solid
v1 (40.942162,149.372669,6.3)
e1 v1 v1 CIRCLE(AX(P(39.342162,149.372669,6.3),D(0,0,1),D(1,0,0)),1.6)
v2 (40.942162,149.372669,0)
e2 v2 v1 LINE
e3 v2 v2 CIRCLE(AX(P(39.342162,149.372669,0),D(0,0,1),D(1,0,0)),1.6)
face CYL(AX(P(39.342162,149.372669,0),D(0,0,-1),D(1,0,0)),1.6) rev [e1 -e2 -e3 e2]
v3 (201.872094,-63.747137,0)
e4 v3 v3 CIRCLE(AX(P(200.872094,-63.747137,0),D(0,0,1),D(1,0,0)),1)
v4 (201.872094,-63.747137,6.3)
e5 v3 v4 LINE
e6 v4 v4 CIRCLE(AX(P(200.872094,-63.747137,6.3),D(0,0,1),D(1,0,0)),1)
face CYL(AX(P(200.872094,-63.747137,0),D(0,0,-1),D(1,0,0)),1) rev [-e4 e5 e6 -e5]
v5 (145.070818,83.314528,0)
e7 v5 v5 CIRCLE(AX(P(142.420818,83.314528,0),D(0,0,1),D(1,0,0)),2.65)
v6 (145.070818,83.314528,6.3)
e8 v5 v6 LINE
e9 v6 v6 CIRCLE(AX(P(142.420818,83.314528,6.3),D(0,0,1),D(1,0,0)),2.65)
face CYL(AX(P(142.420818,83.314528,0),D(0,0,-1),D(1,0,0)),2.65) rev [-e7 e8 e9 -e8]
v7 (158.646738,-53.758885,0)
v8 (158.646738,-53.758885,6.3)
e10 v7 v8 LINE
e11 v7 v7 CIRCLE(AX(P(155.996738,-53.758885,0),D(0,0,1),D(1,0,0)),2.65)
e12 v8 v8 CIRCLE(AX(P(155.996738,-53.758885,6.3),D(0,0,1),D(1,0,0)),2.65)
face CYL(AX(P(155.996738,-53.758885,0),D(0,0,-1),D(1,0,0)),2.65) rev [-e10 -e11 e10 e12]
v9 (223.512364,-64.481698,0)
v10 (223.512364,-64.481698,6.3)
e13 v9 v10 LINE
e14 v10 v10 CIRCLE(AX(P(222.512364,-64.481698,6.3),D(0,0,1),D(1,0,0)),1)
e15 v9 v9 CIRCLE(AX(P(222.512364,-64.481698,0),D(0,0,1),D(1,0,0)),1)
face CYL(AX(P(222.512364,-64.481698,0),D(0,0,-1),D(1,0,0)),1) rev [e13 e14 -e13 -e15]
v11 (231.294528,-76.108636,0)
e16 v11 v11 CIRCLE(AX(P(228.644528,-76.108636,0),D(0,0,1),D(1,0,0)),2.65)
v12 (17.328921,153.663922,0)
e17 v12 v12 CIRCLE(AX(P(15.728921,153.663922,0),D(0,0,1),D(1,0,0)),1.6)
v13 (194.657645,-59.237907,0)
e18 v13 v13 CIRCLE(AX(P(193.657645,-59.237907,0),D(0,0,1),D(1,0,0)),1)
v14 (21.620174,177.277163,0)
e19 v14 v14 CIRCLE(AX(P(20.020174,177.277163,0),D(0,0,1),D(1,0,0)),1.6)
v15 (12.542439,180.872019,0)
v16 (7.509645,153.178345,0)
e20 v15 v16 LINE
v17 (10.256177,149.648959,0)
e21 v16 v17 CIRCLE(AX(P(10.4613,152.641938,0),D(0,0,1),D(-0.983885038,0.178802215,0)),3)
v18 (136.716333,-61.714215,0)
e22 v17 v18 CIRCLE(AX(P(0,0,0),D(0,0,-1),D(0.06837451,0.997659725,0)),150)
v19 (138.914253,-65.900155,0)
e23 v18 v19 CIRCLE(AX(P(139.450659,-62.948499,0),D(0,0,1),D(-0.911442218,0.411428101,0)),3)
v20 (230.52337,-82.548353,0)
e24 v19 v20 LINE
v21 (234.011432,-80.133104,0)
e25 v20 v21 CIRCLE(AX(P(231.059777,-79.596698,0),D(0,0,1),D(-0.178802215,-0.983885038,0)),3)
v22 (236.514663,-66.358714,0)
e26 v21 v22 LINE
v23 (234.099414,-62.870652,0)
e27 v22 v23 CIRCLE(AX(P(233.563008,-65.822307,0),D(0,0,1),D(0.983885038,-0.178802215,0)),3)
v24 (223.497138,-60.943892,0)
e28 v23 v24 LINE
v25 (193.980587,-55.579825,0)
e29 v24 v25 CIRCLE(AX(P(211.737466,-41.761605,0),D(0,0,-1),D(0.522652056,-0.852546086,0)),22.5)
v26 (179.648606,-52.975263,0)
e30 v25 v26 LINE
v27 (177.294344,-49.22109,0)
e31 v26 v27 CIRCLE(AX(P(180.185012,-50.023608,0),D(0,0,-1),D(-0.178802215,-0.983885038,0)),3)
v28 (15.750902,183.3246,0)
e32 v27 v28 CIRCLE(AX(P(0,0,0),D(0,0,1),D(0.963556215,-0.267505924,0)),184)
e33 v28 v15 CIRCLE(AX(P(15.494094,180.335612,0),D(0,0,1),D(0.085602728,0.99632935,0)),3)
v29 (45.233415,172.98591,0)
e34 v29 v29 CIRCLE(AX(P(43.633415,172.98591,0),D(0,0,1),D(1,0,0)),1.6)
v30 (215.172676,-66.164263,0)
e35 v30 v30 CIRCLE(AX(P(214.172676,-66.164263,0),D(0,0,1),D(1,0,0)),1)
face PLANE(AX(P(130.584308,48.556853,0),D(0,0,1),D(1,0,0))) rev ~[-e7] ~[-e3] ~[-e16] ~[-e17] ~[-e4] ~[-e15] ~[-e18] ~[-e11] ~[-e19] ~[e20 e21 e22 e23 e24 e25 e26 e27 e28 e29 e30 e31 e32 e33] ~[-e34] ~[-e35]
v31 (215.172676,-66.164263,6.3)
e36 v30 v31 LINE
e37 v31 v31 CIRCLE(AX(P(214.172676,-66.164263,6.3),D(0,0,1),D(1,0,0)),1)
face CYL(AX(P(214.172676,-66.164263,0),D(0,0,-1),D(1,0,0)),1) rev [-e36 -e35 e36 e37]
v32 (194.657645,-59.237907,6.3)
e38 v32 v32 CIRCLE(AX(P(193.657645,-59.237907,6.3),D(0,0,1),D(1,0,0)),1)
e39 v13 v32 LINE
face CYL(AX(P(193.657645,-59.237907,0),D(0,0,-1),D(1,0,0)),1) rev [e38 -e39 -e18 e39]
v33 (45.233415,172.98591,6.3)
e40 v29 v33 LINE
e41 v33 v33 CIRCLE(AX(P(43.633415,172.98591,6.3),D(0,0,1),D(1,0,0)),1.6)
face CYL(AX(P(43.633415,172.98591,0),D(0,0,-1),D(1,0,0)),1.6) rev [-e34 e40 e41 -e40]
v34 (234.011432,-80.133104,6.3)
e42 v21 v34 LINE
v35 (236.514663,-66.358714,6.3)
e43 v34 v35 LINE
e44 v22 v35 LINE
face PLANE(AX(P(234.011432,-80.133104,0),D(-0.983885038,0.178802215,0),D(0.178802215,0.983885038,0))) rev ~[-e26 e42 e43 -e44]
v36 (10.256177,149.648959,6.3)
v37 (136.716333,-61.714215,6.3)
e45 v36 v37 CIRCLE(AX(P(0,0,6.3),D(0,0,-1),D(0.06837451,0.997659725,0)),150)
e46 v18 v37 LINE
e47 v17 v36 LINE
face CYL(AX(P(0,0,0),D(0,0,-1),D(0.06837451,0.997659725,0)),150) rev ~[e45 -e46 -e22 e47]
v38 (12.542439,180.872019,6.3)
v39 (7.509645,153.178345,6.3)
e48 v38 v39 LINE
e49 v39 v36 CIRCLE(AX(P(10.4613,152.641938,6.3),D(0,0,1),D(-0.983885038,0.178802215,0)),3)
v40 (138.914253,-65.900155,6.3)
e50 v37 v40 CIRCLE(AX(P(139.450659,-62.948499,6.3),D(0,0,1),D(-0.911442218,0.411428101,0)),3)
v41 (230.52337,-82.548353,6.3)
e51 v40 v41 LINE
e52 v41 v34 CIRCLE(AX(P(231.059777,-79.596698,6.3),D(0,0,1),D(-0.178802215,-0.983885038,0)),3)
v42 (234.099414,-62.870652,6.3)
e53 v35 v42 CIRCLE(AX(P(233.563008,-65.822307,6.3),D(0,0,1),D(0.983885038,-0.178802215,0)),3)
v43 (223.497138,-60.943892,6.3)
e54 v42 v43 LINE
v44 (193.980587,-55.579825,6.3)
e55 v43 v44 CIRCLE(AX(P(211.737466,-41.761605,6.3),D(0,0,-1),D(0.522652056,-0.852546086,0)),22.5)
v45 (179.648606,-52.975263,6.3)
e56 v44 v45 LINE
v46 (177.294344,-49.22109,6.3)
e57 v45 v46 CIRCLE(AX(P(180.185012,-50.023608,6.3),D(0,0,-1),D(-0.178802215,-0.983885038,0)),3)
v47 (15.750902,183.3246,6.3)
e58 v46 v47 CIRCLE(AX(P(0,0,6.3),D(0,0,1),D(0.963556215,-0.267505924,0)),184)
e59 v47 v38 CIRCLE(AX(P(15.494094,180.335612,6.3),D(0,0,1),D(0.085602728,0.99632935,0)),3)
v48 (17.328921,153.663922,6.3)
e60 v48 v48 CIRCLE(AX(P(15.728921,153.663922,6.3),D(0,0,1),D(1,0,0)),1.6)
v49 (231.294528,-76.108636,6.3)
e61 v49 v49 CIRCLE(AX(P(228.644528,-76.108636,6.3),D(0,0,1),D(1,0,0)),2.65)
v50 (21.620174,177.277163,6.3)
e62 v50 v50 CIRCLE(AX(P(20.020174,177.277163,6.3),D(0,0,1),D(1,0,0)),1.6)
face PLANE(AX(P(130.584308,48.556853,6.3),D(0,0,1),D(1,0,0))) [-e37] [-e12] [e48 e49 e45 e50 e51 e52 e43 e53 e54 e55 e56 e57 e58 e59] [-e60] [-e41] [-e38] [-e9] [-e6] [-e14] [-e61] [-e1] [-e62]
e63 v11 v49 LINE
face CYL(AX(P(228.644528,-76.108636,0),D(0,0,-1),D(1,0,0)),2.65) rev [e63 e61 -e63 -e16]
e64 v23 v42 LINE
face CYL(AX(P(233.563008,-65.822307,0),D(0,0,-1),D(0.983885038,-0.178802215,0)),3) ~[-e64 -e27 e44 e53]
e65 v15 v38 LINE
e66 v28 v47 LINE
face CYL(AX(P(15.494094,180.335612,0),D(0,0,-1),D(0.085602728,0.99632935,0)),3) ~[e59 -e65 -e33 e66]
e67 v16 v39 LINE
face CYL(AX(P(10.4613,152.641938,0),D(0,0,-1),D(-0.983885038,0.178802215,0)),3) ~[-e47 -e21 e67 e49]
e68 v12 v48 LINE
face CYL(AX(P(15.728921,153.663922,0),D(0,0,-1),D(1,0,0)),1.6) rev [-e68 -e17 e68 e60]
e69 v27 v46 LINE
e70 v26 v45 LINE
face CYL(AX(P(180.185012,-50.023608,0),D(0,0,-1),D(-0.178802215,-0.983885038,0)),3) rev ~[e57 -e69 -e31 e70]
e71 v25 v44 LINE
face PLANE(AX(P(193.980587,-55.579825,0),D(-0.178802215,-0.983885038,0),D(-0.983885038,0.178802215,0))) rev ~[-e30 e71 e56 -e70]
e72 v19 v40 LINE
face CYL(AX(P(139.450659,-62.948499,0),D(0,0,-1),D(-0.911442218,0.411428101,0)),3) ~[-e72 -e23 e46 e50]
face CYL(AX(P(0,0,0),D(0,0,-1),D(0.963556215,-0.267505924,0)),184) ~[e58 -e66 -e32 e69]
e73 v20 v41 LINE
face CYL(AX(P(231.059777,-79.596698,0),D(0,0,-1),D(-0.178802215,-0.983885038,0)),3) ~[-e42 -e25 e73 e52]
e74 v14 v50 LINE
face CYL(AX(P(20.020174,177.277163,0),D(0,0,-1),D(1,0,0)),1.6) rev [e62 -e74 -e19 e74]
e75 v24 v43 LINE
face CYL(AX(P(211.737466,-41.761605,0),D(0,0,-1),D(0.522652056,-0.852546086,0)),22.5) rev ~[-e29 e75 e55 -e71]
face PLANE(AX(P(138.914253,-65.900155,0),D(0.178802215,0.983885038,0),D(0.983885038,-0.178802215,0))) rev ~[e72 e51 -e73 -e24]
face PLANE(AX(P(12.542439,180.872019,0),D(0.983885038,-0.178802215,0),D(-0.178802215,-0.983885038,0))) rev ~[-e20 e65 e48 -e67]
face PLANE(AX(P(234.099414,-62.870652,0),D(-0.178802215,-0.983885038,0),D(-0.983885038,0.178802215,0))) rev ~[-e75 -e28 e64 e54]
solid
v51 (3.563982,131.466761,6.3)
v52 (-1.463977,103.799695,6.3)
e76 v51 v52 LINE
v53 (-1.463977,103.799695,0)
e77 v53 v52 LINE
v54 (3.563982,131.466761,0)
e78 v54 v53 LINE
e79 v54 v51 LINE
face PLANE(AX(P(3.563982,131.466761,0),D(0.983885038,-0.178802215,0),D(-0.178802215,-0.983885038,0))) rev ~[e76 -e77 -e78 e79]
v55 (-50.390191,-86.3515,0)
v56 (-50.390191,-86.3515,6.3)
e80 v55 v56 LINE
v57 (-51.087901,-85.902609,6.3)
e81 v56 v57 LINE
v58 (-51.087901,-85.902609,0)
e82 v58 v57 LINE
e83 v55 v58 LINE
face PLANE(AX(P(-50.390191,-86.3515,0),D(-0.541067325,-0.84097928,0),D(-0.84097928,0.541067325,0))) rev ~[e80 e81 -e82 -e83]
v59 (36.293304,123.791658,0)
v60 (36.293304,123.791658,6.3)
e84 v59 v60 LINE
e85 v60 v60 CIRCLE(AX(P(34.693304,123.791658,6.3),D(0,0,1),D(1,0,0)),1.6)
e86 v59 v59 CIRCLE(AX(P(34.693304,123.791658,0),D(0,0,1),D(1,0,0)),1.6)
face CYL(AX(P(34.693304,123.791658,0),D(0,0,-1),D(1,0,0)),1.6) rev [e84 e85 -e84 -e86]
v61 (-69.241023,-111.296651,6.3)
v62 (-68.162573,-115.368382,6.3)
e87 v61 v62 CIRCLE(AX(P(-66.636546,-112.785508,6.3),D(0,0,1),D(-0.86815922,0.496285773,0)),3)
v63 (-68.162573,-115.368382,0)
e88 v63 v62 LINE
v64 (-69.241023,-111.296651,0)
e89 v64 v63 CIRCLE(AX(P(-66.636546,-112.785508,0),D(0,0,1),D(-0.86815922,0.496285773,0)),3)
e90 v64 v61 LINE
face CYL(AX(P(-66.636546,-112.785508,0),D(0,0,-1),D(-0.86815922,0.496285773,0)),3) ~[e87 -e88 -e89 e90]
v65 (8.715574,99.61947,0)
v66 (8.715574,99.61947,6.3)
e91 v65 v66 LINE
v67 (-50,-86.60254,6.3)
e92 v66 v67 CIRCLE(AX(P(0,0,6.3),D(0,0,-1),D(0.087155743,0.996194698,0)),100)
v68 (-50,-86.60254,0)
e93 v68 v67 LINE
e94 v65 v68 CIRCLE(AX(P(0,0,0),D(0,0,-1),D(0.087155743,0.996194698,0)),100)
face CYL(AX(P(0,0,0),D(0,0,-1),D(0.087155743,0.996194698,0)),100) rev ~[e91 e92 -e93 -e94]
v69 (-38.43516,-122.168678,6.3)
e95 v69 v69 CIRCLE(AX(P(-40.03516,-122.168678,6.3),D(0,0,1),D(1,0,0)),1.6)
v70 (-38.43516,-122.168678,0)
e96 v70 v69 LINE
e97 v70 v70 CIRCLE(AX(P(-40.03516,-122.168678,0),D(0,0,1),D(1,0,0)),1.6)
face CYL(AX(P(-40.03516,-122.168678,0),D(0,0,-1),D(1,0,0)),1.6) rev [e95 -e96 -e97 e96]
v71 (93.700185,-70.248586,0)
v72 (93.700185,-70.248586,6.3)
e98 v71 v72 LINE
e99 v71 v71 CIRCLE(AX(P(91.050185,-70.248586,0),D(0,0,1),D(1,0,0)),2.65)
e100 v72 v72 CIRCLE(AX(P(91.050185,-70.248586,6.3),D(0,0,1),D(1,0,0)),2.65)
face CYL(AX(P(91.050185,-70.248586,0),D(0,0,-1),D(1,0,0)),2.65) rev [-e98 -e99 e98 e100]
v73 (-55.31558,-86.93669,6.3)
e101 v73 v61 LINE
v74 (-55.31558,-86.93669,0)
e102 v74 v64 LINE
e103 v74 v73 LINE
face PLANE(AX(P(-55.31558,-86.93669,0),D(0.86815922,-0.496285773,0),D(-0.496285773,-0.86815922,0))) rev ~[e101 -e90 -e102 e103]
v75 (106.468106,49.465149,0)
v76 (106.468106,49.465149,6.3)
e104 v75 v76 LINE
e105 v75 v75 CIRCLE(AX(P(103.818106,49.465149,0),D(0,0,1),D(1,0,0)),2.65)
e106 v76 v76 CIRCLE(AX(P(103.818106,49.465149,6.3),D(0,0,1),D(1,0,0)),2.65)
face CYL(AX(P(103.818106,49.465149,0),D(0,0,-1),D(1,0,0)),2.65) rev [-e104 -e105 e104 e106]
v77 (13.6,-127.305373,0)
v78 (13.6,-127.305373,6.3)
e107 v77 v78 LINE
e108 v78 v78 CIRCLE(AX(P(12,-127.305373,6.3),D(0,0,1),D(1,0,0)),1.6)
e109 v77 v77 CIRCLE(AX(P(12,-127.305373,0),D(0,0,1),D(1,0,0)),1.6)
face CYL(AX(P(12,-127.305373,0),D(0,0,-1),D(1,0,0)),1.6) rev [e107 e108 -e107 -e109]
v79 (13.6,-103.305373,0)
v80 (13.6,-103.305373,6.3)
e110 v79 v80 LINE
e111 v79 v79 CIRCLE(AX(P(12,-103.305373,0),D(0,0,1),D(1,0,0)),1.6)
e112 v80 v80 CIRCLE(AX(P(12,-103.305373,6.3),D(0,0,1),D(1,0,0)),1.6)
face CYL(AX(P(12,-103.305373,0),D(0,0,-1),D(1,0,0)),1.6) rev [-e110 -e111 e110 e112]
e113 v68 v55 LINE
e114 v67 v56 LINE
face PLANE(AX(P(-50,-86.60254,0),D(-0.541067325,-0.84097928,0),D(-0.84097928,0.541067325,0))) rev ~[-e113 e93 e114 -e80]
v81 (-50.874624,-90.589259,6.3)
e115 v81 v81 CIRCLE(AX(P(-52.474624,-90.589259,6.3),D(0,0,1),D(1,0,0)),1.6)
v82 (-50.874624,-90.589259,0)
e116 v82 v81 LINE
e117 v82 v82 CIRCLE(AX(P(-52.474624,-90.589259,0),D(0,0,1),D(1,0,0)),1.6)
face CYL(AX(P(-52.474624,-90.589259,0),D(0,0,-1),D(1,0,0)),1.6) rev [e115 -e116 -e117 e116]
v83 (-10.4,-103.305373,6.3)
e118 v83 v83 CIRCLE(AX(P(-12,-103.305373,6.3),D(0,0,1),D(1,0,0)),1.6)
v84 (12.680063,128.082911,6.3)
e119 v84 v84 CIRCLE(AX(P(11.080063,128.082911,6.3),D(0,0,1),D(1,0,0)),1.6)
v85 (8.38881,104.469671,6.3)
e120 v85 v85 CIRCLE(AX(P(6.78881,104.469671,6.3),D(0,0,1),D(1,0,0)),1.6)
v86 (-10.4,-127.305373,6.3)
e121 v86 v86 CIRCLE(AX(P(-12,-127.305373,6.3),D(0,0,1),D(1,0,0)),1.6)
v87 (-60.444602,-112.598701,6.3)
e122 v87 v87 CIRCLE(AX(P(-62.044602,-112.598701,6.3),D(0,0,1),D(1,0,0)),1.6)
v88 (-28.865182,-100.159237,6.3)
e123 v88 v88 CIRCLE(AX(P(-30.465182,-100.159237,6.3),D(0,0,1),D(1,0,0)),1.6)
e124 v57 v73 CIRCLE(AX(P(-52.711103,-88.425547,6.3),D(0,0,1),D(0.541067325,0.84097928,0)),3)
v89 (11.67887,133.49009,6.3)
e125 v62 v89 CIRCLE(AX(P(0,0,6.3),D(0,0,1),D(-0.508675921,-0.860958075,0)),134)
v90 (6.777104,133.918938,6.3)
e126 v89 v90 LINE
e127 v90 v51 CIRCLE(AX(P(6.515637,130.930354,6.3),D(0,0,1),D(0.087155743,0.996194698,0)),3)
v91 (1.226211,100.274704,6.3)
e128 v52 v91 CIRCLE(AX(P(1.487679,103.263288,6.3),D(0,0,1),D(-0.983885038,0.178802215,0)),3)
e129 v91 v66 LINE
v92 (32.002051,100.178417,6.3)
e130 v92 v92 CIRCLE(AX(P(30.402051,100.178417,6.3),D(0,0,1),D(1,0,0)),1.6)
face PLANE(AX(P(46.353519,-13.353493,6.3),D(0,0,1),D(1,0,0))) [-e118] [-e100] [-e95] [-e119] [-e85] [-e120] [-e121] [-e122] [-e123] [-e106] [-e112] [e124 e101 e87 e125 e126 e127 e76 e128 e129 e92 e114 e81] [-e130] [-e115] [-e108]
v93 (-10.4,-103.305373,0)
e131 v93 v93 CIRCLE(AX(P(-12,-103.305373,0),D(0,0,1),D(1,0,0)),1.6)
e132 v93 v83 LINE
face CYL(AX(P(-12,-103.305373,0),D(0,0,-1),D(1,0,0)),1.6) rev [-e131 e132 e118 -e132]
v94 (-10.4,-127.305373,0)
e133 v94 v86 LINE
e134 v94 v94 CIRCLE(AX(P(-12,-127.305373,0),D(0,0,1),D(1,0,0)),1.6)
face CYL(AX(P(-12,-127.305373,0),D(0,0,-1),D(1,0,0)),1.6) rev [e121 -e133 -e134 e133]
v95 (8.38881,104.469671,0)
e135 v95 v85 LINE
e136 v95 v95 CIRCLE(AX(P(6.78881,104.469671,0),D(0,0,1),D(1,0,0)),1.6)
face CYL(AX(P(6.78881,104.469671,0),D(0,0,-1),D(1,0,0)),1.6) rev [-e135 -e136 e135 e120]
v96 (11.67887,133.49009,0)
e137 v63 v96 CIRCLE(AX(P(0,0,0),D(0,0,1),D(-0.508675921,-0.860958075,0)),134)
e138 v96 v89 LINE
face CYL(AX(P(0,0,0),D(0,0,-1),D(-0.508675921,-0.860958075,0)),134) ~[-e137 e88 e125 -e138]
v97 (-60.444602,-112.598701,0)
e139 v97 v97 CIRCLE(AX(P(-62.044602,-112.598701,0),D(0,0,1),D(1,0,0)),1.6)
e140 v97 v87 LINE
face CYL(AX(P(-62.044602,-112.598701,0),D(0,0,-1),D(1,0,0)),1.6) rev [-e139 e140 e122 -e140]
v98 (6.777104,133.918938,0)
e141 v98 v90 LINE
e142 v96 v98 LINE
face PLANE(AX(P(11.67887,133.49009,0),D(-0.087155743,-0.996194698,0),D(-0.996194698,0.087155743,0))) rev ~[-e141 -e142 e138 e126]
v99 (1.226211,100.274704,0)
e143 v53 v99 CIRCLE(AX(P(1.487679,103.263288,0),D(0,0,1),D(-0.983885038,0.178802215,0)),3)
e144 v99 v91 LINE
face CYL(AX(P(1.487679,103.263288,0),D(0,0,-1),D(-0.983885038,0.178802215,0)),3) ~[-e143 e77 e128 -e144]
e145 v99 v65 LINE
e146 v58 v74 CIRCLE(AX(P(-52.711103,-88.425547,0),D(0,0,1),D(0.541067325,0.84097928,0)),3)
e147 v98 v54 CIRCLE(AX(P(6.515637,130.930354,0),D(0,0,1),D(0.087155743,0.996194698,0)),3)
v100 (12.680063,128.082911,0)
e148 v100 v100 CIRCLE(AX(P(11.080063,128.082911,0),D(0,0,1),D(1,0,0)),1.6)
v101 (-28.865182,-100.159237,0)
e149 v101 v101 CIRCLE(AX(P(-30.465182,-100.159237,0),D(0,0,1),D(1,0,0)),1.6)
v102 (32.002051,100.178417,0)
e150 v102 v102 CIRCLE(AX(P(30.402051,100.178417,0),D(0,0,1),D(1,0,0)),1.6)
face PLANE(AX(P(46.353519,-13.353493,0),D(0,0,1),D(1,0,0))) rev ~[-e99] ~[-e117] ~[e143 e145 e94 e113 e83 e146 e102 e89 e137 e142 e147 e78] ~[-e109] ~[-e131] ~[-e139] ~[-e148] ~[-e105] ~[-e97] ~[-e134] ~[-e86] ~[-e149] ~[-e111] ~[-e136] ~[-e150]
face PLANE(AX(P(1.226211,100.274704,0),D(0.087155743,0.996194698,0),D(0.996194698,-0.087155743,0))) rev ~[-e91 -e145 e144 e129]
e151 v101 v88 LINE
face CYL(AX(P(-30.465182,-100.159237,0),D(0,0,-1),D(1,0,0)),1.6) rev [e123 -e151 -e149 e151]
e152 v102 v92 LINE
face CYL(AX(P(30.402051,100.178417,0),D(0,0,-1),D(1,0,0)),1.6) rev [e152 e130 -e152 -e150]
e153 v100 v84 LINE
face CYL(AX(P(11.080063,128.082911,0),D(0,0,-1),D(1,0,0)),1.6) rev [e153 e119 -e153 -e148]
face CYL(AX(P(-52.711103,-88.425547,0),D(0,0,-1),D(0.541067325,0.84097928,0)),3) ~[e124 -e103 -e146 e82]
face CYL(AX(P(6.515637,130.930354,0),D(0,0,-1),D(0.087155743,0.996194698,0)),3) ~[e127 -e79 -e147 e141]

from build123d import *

# Parameters (mm, degrees)
F0_R     = 1.6
F0_R_2   = 2.65
F1_DEPTH = 6.3
F2_R     = 2.65
F2_R_2   = 1
F2_R_3   = 1.6
F3_DEPTH = 6.3


# Not quite as in the source:
# - a feature names something its author has since deleted; it is built from what else it names


with BuildPart() as f1:
    # F0 (on Top) → F1 (new body)
    with BuildSketch(Plane.XY):
        with BuildLine():
            ThreePointArc((8.7155742748, 99.6194698092), (95.3716950748, -30.0705799504), (-50, -86.6025403784))
            Line((-50, -86.6025403784), (-50.3901909826, -86.3515001966))
            Line((-50.3901909826, -86.3515001966), (-51.0879005816, -85.9026093909))
            ThreePointArc((-51.0879005816, -85.9026093909), (-53.4238831161, -85.5114532249), (-55.315580219, -86.9366899133))
            Line((-55.315580219, -86.9366899133), (-69.2410233648, -111.2966505134))
            ThreePointArc((-69.2410233648, -111.2966505134), (-69.5365488426, -113.5536105543), (-68.1625734678, -115.3683820561))
            ThreePointArc((-68.1625734678, -115.3683820561), (127.5940316963, -40.9360852487), (11.6788695282, 133.4900895443))
            Line((11.6788695282, 133.4900895443), (6.777103854, 133.918938472))
            ThreePointArc((6.777103854, 133.918938472), (4.6955895728, 133.3151874379), (3.563981512, 131.4667610231))
            Line((3.563981512, 131.4667610231), (-1.4639765495, 103.799694903))
            ThreePointArc((-1.4639765495, 103.799694903), (-0.8971544959, 101.4432412046), (1.226211336, 100.2747041633))
            Line((1.226211336, 100.2747041633), (8.7155742748, 99.6194698092))
        make_face()
        with Locations((-62.0446017151, -112.5987006942)):
            Circle(F0_R, mode=Mode.SUBTRACT)
        with Locations((-40.0351599298, -122.1686783484)):
            Circle(F0_R, mode=Mode.SUBTRACT)
        with Locations((-52.4746240608, -90.5892589089)):
            Circle(F0_R, mode=Mode.SUBTRACT)
        with Locations((-30.4651822756, -100.1592365632)):
            Circle(F0_R, mode=Mode.SUBTRACT)
        with Locations((-12, -127.3053725612)):
            Circle(F0_R, mode=Mode.SUBTRACT)
        with Locations((-12, -103.3053725612)):
            Circle(F0_R, mode=Mode.SUBTRACT)
        with Locations((12, -127.3053725612)):
            Circle(F0_R, mode=Mode.SUBTRACT)
        with Locations((12, -103.3053725612)):
            Circle(F0_R, mode=Mode.SUBTRACT)
        with Locations((91.0501851304, -70.2485856634)):
            Circle(F0_R_2, mode=Mode.SUBTRACT)
        with Locations((30.4020508273, 100.1784173637)):
            Circle(F0_R, mode=Mode.SUBTRACT)
        with Locations((6.7888099169, 104.4696705265)):
            Circle(F0_R, mode=Mode.SUBTRACT)
        with Locations((11.0800630797, 128.0829114369)):
            Circle(F0_R, mode=Mode.SUBTRACT)
        with Locations((103.8181055435, 49.4651489572)):
            Circle(F0_R_2, mode=Mode.SUBTRACT)
        with Locations((34.6933039901, 123.7916582741)):
            Circle(F0_R, mode=Mode.SUBTRACT)
    extrude(amount=F1_DEPTH)


with BuildPart() as f3:
    # F2 (on Top) → F3 (new body)
    with BuildSketch(Plane.XY):
        with BuildLine():
            ThreePointArc((7.5096449532, 153.1783445291), (8.0937160836, 150.7995084871), (10.2561765363, 149.6489587096))
            ThreePointArc((10.2561765363, 149.6489587096), (128.7199574341, 77.0141062283), (136.7163327644, -61.7142151814))
            ThreePointArc((136.7163327644, -61.7142151814), (136.7945445346, -64.3431513116), (138.9142527743, -65.9001545988))
            Line((138.9142527743, -65.9001545988), (230.5233699826, -82.5483527624))
            ThreePointArc((230.5233699826, -82.5483527624), (232.7676151982, -82.0631297717), (234.0114317417, -80.1331042939))
            Line((234.0114317417, -80.1331042939), (236.5146627534, -66.3587137629))
            ThreePointArc((236.5146627534, -66.3587137629), (236.0294397627, -64.1144685472), (234.0994142849, -62.8706520037))
            Line((234.0994142849, -62.8706520037), (223.4971377091, -60.9438917991))
            ThreePointArc((223.4971377091, -60.9438917991), (207.7144166064, -63.8990182243), (193.9805865711, -55.5798253456))
            Line((193.9805865711, -55.5798253456), (179.6486056488, -52.9752629861))
            ThreePointArc((179.6486056488, -52.9752629861), (177.6434252347, -51.6174507815), (177.2943436477, -49.2210900989))
            ThreePointArc((177.2943436477, -49.2210900989), (151.1158206101, 104.9762295062), (15.7509018567, 183.3246003424))
            ThreePointArc((15.7509018567, 183.3246003424), (13.6721883854, 182.7190260465), (12.5424385604, 180.8720189387))
            Line((12.5424385604, 180.8720189387), (7.5096449532, 153.1783445291))
        make_face()
        with Locations((155.9967381506, -53.7588847203)):
            Circle(F2_R, mode=Mode.SUBTRACT)
        with Locations((193.657645472, -59.2379068224)):
            Circle(F2_R_2, mode=Mode.SUBTRACT)
        with Locations((200.8720938117, -63.747137113)):
            Circle(F2_R_2, mode=Mode.SUBTRACT)
        with Locations((214.1726762056, -66.1642625928)):
            Circle(F2_R_2, mode=Mode.SUBTRACT)
        with Locations((228.6445281595, -76.1086358894)):
            Circle(F2_R, mode=Mode.SUBTRACT)
        with Locations((222.5123643875, -64.4816979766)):
            Circle(F2_R_2, mode=Mode.SUBTRACT)
        with Locations((39.3421615831, 149.3726692604)):
            Circle(F2_R_3, mode=Mode.SUBTRACT)
        with Locations((15.7289206727, 153.6639224232)):
            Circle(F2_R_3, mode=Mode.SUBTRACT)
        with Locations((20.0201738355, 177.2771633336)):
            Circle(F2_R_3, mode=Mode.SUBTRACT)
        with Locations((43.6334147459, 172.9859101708)):
            Circle(F2_R_3, mode=Mode.SUBTRACT)
        with Locations((142.4208181661, 83.3145278622)):
            Circle(F2_R, mode=Mode.SUBTRACT)
    extrude(amount=F3_DEPTH)


solid = Compound([f1.part, f3.part])
